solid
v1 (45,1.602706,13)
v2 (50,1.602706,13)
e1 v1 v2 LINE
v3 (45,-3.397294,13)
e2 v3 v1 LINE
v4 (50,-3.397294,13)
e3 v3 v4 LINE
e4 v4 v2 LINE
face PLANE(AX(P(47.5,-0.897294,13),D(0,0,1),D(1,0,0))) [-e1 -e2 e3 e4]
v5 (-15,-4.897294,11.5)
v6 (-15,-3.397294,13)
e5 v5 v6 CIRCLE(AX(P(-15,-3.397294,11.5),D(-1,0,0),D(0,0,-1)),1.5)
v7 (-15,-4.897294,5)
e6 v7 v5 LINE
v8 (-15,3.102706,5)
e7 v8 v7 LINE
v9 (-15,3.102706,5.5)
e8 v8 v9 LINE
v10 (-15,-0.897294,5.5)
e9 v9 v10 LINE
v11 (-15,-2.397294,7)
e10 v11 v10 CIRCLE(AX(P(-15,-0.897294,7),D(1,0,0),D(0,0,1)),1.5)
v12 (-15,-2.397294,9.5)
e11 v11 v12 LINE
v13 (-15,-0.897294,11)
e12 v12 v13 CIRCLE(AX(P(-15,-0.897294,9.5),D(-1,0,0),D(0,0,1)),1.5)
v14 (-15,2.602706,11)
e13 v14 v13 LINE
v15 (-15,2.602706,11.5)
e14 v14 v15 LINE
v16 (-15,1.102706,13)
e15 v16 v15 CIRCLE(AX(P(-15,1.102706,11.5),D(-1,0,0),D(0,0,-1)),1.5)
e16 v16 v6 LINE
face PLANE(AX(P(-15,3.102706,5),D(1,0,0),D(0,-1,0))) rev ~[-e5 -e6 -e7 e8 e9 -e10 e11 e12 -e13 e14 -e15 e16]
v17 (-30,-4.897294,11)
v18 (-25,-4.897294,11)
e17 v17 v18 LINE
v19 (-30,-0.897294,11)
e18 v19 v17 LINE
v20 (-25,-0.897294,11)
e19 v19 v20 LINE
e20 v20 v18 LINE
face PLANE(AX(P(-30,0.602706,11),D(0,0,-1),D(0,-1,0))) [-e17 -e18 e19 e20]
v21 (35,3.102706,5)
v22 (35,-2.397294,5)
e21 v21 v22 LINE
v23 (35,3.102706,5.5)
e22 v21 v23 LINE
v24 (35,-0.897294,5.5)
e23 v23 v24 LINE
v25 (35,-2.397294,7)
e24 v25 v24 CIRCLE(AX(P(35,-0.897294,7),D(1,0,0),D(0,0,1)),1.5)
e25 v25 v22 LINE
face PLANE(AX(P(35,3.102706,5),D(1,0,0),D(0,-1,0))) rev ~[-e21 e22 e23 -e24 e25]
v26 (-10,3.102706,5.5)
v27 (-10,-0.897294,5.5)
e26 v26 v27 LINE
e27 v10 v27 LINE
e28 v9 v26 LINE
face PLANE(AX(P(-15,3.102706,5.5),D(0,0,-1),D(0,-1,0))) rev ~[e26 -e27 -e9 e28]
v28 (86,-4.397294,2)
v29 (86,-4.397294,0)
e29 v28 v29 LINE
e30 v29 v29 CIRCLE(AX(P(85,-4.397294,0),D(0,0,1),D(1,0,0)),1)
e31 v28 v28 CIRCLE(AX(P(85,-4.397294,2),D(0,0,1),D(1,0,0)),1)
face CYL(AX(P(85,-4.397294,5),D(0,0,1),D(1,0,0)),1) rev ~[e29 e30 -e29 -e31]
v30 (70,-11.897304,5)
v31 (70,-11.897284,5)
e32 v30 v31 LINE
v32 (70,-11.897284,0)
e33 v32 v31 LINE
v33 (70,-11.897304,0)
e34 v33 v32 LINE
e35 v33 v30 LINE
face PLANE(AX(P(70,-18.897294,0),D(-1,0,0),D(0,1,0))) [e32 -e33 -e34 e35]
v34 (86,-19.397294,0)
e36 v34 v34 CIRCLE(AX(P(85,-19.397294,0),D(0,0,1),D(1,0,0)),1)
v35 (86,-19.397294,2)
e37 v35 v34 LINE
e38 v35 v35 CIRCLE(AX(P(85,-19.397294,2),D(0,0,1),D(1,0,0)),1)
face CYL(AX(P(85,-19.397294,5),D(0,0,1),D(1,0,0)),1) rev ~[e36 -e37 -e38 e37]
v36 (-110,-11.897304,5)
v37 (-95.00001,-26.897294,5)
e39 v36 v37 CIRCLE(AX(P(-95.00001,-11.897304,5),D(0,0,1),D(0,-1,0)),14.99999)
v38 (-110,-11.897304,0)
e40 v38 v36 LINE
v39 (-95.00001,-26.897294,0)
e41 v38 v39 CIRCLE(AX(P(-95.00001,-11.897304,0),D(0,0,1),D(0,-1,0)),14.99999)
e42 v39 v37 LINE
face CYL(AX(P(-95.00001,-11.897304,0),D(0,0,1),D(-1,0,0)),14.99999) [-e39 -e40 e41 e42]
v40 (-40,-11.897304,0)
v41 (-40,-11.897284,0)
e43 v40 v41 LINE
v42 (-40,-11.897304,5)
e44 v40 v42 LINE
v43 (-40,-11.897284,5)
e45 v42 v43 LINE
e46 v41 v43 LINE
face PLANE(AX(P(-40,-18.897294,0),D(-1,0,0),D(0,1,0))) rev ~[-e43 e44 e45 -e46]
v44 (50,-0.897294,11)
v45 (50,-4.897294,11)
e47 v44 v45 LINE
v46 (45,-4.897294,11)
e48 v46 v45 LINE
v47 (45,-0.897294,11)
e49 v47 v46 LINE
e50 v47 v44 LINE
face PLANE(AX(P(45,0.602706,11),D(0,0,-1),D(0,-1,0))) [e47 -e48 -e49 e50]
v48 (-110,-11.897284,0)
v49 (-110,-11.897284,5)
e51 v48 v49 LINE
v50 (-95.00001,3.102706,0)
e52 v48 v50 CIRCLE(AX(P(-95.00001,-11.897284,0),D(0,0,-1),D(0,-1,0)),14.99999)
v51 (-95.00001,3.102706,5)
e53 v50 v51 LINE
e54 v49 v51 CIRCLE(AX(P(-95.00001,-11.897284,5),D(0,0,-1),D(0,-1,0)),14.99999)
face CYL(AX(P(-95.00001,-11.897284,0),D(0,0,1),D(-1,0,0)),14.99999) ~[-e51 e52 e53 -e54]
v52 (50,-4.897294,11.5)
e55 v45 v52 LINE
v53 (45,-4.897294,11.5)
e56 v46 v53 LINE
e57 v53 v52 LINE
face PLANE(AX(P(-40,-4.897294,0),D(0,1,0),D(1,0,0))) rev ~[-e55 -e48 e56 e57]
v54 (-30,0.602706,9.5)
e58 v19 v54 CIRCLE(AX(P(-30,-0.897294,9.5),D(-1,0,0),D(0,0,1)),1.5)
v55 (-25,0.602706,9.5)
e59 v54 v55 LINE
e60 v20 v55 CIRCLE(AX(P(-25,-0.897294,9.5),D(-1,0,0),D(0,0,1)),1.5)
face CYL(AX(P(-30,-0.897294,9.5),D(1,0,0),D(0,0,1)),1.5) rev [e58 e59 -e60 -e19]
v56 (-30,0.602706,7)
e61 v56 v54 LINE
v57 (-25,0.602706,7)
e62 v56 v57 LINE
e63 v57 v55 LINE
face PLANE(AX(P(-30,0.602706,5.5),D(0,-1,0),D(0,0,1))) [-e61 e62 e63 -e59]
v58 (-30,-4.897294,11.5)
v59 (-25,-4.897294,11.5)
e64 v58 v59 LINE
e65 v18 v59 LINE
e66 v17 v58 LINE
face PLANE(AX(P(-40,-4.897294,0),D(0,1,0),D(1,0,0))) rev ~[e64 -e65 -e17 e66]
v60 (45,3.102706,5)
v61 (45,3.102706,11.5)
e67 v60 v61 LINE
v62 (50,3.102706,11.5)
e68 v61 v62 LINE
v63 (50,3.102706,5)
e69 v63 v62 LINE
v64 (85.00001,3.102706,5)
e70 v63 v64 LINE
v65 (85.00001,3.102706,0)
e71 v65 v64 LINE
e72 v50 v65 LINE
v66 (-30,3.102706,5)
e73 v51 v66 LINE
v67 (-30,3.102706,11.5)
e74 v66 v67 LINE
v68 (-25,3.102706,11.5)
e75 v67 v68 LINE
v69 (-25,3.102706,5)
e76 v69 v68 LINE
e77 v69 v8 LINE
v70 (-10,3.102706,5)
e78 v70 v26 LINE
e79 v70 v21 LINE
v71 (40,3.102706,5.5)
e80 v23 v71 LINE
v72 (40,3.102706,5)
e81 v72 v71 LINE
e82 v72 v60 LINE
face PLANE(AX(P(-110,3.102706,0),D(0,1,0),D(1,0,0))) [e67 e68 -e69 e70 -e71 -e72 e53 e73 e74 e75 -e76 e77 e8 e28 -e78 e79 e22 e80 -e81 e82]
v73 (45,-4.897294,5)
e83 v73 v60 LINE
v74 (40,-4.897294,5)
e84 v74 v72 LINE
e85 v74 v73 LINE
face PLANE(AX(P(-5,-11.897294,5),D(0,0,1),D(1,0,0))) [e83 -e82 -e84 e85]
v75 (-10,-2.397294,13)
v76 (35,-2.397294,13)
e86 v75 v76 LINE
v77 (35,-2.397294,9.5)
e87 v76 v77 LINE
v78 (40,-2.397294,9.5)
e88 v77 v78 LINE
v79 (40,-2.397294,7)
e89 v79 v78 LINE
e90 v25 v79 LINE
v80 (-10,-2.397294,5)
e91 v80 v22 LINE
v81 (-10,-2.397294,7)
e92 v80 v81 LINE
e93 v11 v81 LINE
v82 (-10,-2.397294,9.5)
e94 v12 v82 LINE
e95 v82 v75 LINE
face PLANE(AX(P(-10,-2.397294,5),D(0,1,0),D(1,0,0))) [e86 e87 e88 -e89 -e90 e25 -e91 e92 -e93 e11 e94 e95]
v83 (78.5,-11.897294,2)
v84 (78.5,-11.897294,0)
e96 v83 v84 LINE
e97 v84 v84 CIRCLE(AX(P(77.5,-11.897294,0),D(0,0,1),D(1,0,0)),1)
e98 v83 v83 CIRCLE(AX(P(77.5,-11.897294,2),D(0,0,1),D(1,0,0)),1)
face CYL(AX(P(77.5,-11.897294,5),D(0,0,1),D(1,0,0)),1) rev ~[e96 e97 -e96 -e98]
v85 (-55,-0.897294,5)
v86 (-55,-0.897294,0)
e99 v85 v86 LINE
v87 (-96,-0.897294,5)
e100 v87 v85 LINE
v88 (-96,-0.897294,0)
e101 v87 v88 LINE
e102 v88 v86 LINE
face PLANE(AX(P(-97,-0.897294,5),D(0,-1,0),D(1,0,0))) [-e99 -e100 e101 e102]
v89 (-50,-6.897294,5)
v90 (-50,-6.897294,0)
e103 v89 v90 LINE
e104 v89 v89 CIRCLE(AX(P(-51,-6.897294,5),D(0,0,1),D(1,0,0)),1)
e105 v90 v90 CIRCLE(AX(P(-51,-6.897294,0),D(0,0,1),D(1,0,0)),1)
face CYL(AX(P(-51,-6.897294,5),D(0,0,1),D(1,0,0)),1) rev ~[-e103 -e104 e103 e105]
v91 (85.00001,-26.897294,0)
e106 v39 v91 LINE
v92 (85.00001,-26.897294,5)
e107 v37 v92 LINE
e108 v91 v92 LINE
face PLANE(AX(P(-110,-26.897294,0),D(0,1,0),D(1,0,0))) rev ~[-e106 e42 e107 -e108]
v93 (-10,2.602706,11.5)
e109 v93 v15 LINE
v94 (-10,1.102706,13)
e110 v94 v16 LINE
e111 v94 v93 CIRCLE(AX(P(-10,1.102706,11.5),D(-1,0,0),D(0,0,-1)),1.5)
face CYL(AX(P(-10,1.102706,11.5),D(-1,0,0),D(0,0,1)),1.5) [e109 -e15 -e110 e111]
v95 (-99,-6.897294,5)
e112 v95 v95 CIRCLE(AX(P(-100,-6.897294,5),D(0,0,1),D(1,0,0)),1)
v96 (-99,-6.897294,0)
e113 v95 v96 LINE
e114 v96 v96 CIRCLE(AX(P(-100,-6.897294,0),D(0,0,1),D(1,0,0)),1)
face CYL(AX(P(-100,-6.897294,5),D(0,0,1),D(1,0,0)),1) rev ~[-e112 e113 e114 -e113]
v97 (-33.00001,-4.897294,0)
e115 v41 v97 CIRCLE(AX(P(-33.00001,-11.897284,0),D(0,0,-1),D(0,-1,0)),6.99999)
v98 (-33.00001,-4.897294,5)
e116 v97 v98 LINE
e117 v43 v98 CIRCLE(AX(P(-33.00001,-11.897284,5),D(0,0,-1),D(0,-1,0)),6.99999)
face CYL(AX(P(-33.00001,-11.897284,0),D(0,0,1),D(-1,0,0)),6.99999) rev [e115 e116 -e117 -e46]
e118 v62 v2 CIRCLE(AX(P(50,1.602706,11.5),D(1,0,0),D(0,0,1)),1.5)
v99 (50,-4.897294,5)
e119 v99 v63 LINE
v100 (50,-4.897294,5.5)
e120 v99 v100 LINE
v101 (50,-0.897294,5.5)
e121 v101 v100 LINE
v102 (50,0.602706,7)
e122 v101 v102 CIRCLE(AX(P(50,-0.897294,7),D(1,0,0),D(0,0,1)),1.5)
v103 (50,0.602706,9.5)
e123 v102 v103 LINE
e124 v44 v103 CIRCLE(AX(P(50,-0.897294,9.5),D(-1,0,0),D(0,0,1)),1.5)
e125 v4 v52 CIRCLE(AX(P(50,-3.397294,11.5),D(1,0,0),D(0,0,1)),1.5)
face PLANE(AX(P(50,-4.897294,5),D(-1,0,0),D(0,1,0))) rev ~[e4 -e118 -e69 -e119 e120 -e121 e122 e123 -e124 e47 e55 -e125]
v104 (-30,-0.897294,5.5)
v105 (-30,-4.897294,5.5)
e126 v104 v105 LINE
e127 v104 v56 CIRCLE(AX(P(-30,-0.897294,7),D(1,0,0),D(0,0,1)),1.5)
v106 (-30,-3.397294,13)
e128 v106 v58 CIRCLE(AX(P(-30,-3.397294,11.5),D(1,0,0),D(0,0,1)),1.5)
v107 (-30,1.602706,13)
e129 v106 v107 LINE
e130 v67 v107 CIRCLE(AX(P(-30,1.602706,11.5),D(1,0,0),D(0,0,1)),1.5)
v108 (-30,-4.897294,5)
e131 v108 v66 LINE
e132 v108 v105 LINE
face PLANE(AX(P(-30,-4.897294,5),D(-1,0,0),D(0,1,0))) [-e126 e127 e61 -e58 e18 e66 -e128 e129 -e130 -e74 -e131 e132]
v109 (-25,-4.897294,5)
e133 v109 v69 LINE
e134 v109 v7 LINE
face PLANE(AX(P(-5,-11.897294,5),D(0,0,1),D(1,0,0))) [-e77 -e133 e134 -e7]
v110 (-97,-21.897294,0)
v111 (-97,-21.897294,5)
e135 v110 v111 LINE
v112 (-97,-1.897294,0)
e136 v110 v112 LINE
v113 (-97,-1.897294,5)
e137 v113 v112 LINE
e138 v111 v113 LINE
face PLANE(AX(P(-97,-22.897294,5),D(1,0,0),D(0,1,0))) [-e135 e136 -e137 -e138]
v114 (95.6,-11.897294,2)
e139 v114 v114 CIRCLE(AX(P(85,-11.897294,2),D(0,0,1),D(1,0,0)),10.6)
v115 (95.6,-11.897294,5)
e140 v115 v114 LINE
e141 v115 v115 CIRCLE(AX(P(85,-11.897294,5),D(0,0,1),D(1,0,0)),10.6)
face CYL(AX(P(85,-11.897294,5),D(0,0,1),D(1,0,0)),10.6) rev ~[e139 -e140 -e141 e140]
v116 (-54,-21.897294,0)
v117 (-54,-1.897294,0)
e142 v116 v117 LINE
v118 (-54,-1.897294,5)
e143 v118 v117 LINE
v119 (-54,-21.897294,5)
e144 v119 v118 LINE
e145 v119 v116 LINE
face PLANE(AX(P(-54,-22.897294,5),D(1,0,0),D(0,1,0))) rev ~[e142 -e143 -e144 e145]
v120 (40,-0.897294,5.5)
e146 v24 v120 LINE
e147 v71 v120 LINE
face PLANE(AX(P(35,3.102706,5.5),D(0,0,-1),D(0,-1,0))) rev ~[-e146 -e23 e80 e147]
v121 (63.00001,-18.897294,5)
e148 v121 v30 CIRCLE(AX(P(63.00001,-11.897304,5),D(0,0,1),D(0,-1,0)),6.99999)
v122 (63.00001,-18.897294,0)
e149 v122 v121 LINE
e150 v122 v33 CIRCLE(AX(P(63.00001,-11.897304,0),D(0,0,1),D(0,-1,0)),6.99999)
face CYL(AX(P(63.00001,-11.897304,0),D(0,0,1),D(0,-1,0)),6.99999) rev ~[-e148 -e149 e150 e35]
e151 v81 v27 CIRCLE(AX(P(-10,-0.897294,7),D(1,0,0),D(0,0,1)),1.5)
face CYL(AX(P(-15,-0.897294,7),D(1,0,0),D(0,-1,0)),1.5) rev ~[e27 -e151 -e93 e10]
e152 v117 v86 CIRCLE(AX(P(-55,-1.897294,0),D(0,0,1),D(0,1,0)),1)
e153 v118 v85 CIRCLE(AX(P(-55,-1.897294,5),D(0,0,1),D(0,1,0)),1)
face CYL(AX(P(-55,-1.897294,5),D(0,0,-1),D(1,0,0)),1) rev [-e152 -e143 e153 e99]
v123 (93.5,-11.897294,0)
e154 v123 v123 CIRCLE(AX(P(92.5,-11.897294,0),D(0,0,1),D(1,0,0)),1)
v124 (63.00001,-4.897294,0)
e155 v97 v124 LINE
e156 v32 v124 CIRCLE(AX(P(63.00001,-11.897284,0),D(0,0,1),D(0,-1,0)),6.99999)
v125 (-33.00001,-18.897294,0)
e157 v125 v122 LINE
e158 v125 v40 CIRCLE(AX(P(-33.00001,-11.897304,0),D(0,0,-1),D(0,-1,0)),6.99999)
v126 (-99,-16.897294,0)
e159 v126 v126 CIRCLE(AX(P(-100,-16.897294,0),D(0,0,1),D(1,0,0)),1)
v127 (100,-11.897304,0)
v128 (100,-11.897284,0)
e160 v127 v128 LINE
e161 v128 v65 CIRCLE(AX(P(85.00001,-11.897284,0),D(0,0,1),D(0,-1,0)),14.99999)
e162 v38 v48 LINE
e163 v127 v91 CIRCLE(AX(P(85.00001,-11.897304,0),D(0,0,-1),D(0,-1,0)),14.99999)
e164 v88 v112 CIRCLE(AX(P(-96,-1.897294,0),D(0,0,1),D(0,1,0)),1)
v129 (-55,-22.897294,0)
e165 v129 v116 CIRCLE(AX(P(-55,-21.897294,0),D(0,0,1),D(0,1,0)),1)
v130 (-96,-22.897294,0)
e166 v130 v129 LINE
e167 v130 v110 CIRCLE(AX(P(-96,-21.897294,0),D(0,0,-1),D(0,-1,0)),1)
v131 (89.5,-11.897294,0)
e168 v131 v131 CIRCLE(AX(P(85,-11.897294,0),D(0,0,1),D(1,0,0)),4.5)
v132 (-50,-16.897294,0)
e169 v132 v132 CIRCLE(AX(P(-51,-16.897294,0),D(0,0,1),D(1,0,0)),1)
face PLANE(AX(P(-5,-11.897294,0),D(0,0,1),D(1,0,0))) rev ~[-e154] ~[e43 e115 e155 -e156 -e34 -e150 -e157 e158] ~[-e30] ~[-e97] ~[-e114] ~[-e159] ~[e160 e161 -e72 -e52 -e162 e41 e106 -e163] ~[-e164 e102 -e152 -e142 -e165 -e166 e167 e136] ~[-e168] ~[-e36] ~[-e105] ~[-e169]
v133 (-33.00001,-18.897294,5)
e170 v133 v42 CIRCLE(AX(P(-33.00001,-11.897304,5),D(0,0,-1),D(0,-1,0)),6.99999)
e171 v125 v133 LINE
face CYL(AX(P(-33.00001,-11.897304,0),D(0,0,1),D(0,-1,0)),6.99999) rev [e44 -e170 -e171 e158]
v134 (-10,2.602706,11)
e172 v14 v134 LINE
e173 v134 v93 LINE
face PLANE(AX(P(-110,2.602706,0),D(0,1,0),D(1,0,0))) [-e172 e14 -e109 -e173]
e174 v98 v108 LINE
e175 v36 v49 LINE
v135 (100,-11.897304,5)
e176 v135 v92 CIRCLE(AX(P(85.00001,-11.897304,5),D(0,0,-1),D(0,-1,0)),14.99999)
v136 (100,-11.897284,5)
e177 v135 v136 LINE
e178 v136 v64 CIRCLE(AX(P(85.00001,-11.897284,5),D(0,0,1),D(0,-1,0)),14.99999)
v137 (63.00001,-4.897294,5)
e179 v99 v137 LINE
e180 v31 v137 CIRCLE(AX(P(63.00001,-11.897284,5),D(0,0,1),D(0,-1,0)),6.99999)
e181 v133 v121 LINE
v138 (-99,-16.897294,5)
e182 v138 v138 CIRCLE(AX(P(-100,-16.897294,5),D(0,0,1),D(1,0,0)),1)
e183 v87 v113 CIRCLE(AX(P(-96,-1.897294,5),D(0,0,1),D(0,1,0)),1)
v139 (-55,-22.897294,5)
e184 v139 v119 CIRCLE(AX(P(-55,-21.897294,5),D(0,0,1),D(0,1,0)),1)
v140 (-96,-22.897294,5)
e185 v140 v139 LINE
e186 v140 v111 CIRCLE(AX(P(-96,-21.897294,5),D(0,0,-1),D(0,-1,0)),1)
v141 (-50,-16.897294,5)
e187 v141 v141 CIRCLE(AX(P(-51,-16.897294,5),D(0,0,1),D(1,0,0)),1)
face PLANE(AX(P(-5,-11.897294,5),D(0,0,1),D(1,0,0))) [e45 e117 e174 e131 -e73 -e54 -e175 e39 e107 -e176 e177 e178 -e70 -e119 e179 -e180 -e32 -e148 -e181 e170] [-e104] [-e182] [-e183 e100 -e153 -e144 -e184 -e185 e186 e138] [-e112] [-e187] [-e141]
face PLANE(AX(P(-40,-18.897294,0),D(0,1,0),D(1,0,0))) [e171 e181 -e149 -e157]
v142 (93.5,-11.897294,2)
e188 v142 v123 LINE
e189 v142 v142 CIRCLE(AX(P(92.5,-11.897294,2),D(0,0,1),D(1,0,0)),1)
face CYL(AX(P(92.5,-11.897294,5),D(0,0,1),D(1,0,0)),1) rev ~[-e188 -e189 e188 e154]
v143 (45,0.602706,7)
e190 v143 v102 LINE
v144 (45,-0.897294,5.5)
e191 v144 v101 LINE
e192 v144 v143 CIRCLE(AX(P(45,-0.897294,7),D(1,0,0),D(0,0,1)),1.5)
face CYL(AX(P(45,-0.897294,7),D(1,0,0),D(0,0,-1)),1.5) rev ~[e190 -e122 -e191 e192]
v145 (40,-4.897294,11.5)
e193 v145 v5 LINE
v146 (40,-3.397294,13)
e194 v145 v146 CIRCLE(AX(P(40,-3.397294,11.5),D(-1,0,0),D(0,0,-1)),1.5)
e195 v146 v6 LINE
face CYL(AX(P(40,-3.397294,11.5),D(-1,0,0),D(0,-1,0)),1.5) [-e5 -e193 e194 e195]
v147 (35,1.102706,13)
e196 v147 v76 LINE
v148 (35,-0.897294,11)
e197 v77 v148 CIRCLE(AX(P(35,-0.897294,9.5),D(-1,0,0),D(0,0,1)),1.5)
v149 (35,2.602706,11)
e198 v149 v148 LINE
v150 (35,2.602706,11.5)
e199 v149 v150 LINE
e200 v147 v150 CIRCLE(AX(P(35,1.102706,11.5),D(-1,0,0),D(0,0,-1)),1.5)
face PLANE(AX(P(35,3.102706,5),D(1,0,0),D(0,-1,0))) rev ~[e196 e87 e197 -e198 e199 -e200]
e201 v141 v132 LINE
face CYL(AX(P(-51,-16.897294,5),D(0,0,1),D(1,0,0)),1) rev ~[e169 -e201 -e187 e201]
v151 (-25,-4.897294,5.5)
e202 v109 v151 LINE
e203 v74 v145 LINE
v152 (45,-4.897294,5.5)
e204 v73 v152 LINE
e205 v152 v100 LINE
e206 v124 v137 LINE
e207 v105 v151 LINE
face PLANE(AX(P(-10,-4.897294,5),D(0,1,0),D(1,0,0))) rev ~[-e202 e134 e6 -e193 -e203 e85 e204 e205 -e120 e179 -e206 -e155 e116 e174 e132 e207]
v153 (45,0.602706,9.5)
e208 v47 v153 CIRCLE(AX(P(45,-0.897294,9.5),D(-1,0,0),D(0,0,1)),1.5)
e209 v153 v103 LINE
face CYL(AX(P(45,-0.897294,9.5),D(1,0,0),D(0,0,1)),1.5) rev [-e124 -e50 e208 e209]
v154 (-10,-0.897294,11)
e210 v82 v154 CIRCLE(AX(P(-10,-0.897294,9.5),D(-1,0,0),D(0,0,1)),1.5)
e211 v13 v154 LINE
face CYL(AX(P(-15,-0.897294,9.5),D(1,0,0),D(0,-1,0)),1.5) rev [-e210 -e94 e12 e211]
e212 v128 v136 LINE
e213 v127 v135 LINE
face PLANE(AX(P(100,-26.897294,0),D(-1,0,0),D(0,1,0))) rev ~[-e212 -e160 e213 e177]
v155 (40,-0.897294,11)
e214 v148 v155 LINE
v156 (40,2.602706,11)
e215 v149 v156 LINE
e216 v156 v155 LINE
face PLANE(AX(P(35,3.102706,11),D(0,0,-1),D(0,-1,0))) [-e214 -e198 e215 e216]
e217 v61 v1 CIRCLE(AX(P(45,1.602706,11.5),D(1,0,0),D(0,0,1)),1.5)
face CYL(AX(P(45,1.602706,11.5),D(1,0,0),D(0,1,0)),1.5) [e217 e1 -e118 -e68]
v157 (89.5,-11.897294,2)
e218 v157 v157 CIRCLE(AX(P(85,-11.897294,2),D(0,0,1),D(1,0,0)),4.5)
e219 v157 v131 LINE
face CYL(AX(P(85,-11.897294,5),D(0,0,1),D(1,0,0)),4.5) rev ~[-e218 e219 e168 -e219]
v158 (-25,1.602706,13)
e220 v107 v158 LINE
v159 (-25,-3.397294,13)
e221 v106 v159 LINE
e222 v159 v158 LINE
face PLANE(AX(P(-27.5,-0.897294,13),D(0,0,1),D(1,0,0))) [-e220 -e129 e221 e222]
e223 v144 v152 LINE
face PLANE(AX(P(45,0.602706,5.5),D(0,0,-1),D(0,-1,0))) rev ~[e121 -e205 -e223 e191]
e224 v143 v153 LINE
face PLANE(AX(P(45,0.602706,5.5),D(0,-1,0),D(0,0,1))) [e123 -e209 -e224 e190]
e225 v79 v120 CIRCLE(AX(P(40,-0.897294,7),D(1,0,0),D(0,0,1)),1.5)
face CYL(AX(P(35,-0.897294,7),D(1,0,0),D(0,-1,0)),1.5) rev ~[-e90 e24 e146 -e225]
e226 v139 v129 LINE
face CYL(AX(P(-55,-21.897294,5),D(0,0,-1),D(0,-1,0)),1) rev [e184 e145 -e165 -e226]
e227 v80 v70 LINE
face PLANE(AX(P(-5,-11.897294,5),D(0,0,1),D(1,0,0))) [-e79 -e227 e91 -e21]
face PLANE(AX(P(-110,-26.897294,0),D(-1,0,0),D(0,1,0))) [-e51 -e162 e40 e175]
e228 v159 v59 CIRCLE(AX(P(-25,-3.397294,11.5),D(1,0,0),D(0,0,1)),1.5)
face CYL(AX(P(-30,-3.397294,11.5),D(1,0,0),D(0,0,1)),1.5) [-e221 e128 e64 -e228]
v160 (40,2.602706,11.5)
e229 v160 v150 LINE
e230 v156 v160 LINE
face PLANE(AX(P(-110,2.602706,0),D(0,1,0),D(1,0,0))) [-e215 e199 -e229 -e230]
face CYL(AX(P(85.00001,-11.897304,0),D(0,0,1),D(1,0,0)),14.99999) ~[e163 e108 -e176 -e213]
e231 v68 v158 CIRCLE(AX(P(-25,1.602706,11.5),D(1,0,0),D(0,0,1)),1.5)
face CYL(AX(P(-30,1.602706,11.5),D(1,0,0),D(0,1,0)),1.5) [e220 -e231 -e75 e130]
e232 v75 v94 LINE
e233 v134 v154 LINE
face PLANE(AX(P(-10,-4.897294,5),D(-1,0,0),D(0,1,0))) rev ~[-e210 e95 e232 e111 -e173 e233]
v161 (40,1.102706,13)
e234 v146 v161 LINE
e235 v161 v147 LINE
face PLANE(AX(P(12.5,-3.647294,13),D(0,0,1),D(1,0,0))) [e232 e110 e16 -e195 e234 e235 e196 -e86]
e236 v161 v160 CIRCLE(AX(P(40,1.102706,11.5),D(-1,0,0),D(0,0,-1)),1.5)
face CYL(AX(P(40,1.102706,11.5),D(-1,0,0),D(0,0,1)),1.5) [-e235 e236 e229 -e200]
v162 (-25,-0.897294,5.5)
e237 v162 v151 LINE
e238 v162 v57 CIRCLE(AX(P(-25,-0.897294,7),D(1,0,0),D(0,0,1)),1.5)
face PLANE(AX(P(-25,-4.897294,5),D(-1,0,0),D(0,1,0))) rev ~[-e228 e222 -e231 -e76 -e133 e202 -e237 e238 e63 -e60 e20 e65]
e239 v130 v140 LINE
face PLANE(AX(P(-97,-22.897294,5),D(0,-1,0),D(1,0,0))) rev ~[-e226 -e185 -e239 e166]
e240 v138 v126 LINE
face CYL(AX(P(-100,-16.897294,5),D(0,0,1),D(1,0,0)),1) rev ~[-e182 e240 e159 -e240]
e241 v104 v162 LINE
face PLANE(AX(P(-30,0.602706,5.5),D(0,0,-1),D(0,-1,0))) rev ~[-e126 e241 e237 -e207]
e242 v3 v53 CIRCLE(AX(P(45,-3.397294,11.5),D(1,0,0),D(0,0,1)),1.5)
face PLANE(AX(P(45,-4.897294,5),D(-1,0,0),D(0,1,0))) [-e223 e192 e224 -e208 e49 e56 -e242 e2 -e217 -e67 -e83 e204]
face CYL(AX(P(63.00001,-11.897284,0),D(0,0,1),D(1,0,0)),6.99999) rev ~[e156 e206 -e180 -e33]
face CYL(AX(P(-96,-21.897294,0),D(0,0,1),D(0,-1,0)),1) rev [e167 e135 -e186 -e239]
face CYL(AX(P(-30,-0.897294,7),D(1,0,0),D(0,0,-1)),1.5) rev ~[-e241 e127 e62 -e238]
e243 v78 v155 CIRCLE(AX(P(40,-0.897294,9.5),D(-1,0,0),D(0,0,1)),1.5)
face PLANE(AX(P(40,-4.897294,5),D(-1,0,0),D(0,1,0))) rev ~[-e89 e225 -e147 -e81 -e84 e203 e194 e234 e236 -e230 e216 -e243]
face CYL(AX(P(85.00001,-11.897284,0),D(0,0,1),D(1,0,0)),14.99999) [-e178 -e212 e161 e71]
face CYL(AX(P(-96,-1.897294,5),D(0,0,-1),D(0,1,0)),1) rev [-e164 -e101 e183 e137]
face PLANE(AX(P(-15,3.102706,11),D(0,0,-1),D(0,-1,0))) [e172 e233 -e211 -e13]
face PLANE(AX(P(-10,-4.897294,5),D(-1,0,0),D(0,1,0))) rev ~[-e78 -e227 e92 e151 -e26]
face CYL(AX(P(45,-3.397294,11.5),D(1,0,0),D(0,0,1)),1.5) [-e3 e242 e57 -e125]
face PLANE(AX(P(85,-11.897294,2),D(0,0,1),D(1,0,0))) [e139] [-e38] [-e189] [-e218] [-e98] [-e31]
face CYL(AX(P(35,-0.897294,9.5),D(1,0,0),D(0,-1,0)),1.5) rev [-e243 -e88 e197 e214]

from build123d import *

# Parameters (mm, degrees)
F0_W      = 210
F0_H      = 30
F0_W_2    = 110
F0_H_2    = 14
F1_DEPTH  = 5
F2_R      = 10.6
F2_R_2    = 1
F2_R_3    = 4.5
F2_W      = 43
F2_H      = 22
F2_R_4    = 2.75
F3_DEPTH  = 3
F4_DEPTH  = 25
F5_R      = 14.99999
F6_R      = 6.99999
F7_R      = 1
F8_DEPTH  = 25
F9_W      = 5
F9_H      = 8
F10_DEPTH = 8
F11_W     = 5.5
F11_H     = 5.5
F12_DEPTH = 6
F13_W     = 5.5
F13_H     = 5.5
F14_DEPTH = 6
F15_W     = 5.5
F15_H     = 5.5
F16_W     = 5.5
F16_H     = 5.5
F17_DEPTH = 6
F9_W_2    = 45
F9_H_2    = 2.5
F18_DEPTH = 8
F19_DEPTH = 0.5
F20_R     = 1.5


# Not quite as in the source:
# - a fillet or chamfer is up to 0.001 mm smaller than in the source, because OpenCascade refuses the exact size
# - a feature names something its author has since deleted; it is built from what else it names


with BuildPart() as f1:
    # F0 (on Top) → F1 (new body)
    with BuildSketch(Plane.XY):
        with Locations((-5, -11.8972941886)):
            Rectangle(F0_W, F0_H)
        with Locations((15, -11.8972941886)):
            Rectangle(F0_W_2, F0_H_2, mode=Mode.SUBTRACT)
    extrude(amount=F1_DEPTH)

    # F2 (on face) → F3 (cut)
    with BuildSketch(Plane.XY.offset(5)):
        with Locations((85, -11.8972941886)):
            Circle(F2_R)
        with Locations((85, -19.3972941886)):
            Circle(F2_R_2, mode=Mode.SUBTRACT)
        with Locations((85, -11.8972941886)):
            Circle(F2_R_3, mode=Mode.SUBTRACT)
        with Locations((77.5, -11.8972941886)):
            Circle(F2_R_2, mode=Mode.SUBTRACT)
        with Locations((92.5, -11.8972941886)):
            Circle(F2_R_2, mode=Mode.SUBTRACT)
        with Locations((85, -4.3972941886)):
            Circle(F2_R_2, mode=Mode.SUBTRACT)
        with Locations((-75.5, -11.8972941886)):
            Rectangle(F2_W, F2_H)
        with Locations((-65, -11.8972941886)):
            Circle(F2_R_4, mode=Mode.SUBTRACT)
    extrude(amount=-F3_DEPTH, mode=Mode.SUBTRACT)

    # F2 (on face) → F4 (cut)
    with BuildSketch(Plane.XY.offset(5)):
        with Locations((-75.5, -11.8972941886)):
            Rectangle(F2_W, F2_H)
        with Locations((-65, -11.8972941886)):
            Circle(F2_R_4, mode=Mode.SUBTRACT)
        with Locations((85, -11.8972941886)):
            Circle(F2_R_3)
        with Locations((-65, -11.8972941886)):
            Circle(F2_R_4)
        with Locations((85, -4.3972941886)):
            Circle(F2_R_2)
        with Locations((77.5, -11.8972941886)):
            Circle(F2_R_2)
        with Locations((85, -19.3972941886)):
            Circle(F2_R_2)
        with Locations((92.5, -11.8972941886)):
            Circle(F2_R_2)
    extrude(amount=-F4_DEPTH, mode=Mode.SUBTRACT)

    # F5 (radius 15 in the source; OpenCascade refuses exactly that, so slightly less here)
    f5_edges = [f1.edges().sort_by_distance(p)[0] for p in [
        (100, 3.102706, 2.5),
        (100, -26.897294, 2.5),
        (-110, -26.897294, 2.5),
        (-110, 3.102706, 2.5),
    ]]
    fillet(f5_edges, radius=F5_R)

    # F6 (radius 7 in the source; OpenCascade refuses exactly that, so slightly less here)
    f6_edges = [f1.edges().sort_by_distance(p)[0] for p in [
        (-40, -4.897294, 2.5),
        (-40, -18.897294, 2.5),
        (70, -4.897294, 2.5),
        (70, -18.897294, 2.5),
    ]]
    fillet(f6_edges, radius=F6_R)

    # F7
    f7_edges = [f1.edges().sort_by_distance(p)[0] for p in [
        (-97, -0.897294, 2.5),
        (-97, -22.897294, 2.5),
        (-54, -0.897294, 2.5),
        (-54, -22.897294, 2.5),
    ]]
    fillet(f7_edges, radius=F7_R)

    # F2 (on face) → F8 (cut)
    with BuildSketch(Plane.XY.offset(5)):
        with Locations((-100, -6.8972941886)):
            Circle(F2_R_2)
        with Locations((-100, -16.8972941886)):
            Circle(F2_R_2)
        with Locations((-51, -6.8972941886)):
            Circle(F2_R_2)
        with Locations((-51, -16.8972941886)):
            Circle(F2_R_2)
    extrude(amount=-F8_DEPTH, mode=Mode.SUBTRACT)

    # F9 (on face) → F10 (join)
    with BuildSketch(Plane.XY.offset(5)):
        with Locations((-27.5, -0.8972941886)):
            Rectangle(F9_W, F9_H)
        Polygon((-10, 3.1027058114), (-15, 3.1027058114), (-15, -4.8972941886), (-10, -4.8972941886), (-10, -2.3972941886), align=None)
        Polygon((40, 3.1027058114), (35, 3.1027058114), (35, -2.3972941886), (35, -4.8972941886), (40, -4.8972941886), align=None)
        with Locations((47.5, -0.8972941886)):
            Rectangle(F9_W, F9_H)
    extrude(amount=F10_DEPTH)

    # F11 (on face) → F12 (cut)
    with BuildSketch(Plane(origin=(-30, 0, 0), x_dir=(0, -1, 0), z_dir=(-1, 0, 0))):
        with Locations((2.1472941886, 8.25)):
            Rectangle(F11_W, F11_H)
    extrude(amount=-F12_DEPTH, mode=Mode.SUBTRACT)

    # F13 (on face) → F14 (cut)
    with BuildSketch(Plane(origin=(-15, 0, 0), x_dir=(0, -1, 0), z_dir=(-1, 0, 0))):
        with Locations((-0.3527058114, 8.25)):
            Rectangle(F13_W, F13_H)
    extrude(amount=-F14_DEPTH, mode=Mode.SUBTRACT)

    # F15 (on face) + F16 (on face) → F17 (cut)
    with BuildSketch(Plane(origin=(35, 0, 0), x_dir=(0, -1, 0), z_dir=(-1, 0, 0))):
        with Locations((-0.3527058114, 8.25)):
            Rectangle(F15_W, F15_H)
    with BuildSketch(Plane(origin=(45, 0, 0), x_dir=(0, -1, 0), z_dir=(-1, 0, 0))):
        with Locations((2.1472941886, 8.25)):
            Rectangle(F16_W, F16_H)
    extrude(amount=-F17_DEPTH, mode=Mode.SUBTRACT)

    # F9 (on face) → F18 (join)
    with BuildSketch(Plane.XY.offset(5)):
        with Locations((12.5, -3.6472941886)):
            Rectangle(F9_W_2, F9_H_2)
    extrude(amount=F18_DEPTH)

    # F19 (cut): faces of the model
    f19_faces = [f1.faces().sort_by_distance(p)[0] for p in [
        (37.5, 3.1027058114, 12),
        (-12.5, 3.1027058114, 12),
        (47.5, -4.8972941886, 12),
        (-27.5, -4.8972941886, 12),
    ]]
    extrude(f19_faces, amount=-F19_DEPTH, dir=(0, 1, 0), mode=Mode.SUBTRACT)

    # F20
    f20_edges = [f1.edges().sort_by_distance(p)[0] for p in [
        (-27.5, 3.102706, 13),
        (-27.5, -4.897294, 13),
        (12.5, -4.897294, 13),
        (-12.5, 2.602706, 13),
        (-12.5, -2.397294, 5.5),
        (-12.5, -2.397294, 11),
        (-27.5, 0.602706, 5.5),
        (-27.5, 0.602706, 11),
        (37.5, 2.602706, 13),
        (47.5, 3.102706, 13),
        (47.5, -4.897294, 13),
        (37.5, -2.397294, 11),
        (37.5, -2.397294, 5.5),
        (47.5, 0.602706, 5.5),
        (47.5, 0.602706, 11),
    ]]
    fillet(f20_edges, radius=F20_R)


solid = f1.part
